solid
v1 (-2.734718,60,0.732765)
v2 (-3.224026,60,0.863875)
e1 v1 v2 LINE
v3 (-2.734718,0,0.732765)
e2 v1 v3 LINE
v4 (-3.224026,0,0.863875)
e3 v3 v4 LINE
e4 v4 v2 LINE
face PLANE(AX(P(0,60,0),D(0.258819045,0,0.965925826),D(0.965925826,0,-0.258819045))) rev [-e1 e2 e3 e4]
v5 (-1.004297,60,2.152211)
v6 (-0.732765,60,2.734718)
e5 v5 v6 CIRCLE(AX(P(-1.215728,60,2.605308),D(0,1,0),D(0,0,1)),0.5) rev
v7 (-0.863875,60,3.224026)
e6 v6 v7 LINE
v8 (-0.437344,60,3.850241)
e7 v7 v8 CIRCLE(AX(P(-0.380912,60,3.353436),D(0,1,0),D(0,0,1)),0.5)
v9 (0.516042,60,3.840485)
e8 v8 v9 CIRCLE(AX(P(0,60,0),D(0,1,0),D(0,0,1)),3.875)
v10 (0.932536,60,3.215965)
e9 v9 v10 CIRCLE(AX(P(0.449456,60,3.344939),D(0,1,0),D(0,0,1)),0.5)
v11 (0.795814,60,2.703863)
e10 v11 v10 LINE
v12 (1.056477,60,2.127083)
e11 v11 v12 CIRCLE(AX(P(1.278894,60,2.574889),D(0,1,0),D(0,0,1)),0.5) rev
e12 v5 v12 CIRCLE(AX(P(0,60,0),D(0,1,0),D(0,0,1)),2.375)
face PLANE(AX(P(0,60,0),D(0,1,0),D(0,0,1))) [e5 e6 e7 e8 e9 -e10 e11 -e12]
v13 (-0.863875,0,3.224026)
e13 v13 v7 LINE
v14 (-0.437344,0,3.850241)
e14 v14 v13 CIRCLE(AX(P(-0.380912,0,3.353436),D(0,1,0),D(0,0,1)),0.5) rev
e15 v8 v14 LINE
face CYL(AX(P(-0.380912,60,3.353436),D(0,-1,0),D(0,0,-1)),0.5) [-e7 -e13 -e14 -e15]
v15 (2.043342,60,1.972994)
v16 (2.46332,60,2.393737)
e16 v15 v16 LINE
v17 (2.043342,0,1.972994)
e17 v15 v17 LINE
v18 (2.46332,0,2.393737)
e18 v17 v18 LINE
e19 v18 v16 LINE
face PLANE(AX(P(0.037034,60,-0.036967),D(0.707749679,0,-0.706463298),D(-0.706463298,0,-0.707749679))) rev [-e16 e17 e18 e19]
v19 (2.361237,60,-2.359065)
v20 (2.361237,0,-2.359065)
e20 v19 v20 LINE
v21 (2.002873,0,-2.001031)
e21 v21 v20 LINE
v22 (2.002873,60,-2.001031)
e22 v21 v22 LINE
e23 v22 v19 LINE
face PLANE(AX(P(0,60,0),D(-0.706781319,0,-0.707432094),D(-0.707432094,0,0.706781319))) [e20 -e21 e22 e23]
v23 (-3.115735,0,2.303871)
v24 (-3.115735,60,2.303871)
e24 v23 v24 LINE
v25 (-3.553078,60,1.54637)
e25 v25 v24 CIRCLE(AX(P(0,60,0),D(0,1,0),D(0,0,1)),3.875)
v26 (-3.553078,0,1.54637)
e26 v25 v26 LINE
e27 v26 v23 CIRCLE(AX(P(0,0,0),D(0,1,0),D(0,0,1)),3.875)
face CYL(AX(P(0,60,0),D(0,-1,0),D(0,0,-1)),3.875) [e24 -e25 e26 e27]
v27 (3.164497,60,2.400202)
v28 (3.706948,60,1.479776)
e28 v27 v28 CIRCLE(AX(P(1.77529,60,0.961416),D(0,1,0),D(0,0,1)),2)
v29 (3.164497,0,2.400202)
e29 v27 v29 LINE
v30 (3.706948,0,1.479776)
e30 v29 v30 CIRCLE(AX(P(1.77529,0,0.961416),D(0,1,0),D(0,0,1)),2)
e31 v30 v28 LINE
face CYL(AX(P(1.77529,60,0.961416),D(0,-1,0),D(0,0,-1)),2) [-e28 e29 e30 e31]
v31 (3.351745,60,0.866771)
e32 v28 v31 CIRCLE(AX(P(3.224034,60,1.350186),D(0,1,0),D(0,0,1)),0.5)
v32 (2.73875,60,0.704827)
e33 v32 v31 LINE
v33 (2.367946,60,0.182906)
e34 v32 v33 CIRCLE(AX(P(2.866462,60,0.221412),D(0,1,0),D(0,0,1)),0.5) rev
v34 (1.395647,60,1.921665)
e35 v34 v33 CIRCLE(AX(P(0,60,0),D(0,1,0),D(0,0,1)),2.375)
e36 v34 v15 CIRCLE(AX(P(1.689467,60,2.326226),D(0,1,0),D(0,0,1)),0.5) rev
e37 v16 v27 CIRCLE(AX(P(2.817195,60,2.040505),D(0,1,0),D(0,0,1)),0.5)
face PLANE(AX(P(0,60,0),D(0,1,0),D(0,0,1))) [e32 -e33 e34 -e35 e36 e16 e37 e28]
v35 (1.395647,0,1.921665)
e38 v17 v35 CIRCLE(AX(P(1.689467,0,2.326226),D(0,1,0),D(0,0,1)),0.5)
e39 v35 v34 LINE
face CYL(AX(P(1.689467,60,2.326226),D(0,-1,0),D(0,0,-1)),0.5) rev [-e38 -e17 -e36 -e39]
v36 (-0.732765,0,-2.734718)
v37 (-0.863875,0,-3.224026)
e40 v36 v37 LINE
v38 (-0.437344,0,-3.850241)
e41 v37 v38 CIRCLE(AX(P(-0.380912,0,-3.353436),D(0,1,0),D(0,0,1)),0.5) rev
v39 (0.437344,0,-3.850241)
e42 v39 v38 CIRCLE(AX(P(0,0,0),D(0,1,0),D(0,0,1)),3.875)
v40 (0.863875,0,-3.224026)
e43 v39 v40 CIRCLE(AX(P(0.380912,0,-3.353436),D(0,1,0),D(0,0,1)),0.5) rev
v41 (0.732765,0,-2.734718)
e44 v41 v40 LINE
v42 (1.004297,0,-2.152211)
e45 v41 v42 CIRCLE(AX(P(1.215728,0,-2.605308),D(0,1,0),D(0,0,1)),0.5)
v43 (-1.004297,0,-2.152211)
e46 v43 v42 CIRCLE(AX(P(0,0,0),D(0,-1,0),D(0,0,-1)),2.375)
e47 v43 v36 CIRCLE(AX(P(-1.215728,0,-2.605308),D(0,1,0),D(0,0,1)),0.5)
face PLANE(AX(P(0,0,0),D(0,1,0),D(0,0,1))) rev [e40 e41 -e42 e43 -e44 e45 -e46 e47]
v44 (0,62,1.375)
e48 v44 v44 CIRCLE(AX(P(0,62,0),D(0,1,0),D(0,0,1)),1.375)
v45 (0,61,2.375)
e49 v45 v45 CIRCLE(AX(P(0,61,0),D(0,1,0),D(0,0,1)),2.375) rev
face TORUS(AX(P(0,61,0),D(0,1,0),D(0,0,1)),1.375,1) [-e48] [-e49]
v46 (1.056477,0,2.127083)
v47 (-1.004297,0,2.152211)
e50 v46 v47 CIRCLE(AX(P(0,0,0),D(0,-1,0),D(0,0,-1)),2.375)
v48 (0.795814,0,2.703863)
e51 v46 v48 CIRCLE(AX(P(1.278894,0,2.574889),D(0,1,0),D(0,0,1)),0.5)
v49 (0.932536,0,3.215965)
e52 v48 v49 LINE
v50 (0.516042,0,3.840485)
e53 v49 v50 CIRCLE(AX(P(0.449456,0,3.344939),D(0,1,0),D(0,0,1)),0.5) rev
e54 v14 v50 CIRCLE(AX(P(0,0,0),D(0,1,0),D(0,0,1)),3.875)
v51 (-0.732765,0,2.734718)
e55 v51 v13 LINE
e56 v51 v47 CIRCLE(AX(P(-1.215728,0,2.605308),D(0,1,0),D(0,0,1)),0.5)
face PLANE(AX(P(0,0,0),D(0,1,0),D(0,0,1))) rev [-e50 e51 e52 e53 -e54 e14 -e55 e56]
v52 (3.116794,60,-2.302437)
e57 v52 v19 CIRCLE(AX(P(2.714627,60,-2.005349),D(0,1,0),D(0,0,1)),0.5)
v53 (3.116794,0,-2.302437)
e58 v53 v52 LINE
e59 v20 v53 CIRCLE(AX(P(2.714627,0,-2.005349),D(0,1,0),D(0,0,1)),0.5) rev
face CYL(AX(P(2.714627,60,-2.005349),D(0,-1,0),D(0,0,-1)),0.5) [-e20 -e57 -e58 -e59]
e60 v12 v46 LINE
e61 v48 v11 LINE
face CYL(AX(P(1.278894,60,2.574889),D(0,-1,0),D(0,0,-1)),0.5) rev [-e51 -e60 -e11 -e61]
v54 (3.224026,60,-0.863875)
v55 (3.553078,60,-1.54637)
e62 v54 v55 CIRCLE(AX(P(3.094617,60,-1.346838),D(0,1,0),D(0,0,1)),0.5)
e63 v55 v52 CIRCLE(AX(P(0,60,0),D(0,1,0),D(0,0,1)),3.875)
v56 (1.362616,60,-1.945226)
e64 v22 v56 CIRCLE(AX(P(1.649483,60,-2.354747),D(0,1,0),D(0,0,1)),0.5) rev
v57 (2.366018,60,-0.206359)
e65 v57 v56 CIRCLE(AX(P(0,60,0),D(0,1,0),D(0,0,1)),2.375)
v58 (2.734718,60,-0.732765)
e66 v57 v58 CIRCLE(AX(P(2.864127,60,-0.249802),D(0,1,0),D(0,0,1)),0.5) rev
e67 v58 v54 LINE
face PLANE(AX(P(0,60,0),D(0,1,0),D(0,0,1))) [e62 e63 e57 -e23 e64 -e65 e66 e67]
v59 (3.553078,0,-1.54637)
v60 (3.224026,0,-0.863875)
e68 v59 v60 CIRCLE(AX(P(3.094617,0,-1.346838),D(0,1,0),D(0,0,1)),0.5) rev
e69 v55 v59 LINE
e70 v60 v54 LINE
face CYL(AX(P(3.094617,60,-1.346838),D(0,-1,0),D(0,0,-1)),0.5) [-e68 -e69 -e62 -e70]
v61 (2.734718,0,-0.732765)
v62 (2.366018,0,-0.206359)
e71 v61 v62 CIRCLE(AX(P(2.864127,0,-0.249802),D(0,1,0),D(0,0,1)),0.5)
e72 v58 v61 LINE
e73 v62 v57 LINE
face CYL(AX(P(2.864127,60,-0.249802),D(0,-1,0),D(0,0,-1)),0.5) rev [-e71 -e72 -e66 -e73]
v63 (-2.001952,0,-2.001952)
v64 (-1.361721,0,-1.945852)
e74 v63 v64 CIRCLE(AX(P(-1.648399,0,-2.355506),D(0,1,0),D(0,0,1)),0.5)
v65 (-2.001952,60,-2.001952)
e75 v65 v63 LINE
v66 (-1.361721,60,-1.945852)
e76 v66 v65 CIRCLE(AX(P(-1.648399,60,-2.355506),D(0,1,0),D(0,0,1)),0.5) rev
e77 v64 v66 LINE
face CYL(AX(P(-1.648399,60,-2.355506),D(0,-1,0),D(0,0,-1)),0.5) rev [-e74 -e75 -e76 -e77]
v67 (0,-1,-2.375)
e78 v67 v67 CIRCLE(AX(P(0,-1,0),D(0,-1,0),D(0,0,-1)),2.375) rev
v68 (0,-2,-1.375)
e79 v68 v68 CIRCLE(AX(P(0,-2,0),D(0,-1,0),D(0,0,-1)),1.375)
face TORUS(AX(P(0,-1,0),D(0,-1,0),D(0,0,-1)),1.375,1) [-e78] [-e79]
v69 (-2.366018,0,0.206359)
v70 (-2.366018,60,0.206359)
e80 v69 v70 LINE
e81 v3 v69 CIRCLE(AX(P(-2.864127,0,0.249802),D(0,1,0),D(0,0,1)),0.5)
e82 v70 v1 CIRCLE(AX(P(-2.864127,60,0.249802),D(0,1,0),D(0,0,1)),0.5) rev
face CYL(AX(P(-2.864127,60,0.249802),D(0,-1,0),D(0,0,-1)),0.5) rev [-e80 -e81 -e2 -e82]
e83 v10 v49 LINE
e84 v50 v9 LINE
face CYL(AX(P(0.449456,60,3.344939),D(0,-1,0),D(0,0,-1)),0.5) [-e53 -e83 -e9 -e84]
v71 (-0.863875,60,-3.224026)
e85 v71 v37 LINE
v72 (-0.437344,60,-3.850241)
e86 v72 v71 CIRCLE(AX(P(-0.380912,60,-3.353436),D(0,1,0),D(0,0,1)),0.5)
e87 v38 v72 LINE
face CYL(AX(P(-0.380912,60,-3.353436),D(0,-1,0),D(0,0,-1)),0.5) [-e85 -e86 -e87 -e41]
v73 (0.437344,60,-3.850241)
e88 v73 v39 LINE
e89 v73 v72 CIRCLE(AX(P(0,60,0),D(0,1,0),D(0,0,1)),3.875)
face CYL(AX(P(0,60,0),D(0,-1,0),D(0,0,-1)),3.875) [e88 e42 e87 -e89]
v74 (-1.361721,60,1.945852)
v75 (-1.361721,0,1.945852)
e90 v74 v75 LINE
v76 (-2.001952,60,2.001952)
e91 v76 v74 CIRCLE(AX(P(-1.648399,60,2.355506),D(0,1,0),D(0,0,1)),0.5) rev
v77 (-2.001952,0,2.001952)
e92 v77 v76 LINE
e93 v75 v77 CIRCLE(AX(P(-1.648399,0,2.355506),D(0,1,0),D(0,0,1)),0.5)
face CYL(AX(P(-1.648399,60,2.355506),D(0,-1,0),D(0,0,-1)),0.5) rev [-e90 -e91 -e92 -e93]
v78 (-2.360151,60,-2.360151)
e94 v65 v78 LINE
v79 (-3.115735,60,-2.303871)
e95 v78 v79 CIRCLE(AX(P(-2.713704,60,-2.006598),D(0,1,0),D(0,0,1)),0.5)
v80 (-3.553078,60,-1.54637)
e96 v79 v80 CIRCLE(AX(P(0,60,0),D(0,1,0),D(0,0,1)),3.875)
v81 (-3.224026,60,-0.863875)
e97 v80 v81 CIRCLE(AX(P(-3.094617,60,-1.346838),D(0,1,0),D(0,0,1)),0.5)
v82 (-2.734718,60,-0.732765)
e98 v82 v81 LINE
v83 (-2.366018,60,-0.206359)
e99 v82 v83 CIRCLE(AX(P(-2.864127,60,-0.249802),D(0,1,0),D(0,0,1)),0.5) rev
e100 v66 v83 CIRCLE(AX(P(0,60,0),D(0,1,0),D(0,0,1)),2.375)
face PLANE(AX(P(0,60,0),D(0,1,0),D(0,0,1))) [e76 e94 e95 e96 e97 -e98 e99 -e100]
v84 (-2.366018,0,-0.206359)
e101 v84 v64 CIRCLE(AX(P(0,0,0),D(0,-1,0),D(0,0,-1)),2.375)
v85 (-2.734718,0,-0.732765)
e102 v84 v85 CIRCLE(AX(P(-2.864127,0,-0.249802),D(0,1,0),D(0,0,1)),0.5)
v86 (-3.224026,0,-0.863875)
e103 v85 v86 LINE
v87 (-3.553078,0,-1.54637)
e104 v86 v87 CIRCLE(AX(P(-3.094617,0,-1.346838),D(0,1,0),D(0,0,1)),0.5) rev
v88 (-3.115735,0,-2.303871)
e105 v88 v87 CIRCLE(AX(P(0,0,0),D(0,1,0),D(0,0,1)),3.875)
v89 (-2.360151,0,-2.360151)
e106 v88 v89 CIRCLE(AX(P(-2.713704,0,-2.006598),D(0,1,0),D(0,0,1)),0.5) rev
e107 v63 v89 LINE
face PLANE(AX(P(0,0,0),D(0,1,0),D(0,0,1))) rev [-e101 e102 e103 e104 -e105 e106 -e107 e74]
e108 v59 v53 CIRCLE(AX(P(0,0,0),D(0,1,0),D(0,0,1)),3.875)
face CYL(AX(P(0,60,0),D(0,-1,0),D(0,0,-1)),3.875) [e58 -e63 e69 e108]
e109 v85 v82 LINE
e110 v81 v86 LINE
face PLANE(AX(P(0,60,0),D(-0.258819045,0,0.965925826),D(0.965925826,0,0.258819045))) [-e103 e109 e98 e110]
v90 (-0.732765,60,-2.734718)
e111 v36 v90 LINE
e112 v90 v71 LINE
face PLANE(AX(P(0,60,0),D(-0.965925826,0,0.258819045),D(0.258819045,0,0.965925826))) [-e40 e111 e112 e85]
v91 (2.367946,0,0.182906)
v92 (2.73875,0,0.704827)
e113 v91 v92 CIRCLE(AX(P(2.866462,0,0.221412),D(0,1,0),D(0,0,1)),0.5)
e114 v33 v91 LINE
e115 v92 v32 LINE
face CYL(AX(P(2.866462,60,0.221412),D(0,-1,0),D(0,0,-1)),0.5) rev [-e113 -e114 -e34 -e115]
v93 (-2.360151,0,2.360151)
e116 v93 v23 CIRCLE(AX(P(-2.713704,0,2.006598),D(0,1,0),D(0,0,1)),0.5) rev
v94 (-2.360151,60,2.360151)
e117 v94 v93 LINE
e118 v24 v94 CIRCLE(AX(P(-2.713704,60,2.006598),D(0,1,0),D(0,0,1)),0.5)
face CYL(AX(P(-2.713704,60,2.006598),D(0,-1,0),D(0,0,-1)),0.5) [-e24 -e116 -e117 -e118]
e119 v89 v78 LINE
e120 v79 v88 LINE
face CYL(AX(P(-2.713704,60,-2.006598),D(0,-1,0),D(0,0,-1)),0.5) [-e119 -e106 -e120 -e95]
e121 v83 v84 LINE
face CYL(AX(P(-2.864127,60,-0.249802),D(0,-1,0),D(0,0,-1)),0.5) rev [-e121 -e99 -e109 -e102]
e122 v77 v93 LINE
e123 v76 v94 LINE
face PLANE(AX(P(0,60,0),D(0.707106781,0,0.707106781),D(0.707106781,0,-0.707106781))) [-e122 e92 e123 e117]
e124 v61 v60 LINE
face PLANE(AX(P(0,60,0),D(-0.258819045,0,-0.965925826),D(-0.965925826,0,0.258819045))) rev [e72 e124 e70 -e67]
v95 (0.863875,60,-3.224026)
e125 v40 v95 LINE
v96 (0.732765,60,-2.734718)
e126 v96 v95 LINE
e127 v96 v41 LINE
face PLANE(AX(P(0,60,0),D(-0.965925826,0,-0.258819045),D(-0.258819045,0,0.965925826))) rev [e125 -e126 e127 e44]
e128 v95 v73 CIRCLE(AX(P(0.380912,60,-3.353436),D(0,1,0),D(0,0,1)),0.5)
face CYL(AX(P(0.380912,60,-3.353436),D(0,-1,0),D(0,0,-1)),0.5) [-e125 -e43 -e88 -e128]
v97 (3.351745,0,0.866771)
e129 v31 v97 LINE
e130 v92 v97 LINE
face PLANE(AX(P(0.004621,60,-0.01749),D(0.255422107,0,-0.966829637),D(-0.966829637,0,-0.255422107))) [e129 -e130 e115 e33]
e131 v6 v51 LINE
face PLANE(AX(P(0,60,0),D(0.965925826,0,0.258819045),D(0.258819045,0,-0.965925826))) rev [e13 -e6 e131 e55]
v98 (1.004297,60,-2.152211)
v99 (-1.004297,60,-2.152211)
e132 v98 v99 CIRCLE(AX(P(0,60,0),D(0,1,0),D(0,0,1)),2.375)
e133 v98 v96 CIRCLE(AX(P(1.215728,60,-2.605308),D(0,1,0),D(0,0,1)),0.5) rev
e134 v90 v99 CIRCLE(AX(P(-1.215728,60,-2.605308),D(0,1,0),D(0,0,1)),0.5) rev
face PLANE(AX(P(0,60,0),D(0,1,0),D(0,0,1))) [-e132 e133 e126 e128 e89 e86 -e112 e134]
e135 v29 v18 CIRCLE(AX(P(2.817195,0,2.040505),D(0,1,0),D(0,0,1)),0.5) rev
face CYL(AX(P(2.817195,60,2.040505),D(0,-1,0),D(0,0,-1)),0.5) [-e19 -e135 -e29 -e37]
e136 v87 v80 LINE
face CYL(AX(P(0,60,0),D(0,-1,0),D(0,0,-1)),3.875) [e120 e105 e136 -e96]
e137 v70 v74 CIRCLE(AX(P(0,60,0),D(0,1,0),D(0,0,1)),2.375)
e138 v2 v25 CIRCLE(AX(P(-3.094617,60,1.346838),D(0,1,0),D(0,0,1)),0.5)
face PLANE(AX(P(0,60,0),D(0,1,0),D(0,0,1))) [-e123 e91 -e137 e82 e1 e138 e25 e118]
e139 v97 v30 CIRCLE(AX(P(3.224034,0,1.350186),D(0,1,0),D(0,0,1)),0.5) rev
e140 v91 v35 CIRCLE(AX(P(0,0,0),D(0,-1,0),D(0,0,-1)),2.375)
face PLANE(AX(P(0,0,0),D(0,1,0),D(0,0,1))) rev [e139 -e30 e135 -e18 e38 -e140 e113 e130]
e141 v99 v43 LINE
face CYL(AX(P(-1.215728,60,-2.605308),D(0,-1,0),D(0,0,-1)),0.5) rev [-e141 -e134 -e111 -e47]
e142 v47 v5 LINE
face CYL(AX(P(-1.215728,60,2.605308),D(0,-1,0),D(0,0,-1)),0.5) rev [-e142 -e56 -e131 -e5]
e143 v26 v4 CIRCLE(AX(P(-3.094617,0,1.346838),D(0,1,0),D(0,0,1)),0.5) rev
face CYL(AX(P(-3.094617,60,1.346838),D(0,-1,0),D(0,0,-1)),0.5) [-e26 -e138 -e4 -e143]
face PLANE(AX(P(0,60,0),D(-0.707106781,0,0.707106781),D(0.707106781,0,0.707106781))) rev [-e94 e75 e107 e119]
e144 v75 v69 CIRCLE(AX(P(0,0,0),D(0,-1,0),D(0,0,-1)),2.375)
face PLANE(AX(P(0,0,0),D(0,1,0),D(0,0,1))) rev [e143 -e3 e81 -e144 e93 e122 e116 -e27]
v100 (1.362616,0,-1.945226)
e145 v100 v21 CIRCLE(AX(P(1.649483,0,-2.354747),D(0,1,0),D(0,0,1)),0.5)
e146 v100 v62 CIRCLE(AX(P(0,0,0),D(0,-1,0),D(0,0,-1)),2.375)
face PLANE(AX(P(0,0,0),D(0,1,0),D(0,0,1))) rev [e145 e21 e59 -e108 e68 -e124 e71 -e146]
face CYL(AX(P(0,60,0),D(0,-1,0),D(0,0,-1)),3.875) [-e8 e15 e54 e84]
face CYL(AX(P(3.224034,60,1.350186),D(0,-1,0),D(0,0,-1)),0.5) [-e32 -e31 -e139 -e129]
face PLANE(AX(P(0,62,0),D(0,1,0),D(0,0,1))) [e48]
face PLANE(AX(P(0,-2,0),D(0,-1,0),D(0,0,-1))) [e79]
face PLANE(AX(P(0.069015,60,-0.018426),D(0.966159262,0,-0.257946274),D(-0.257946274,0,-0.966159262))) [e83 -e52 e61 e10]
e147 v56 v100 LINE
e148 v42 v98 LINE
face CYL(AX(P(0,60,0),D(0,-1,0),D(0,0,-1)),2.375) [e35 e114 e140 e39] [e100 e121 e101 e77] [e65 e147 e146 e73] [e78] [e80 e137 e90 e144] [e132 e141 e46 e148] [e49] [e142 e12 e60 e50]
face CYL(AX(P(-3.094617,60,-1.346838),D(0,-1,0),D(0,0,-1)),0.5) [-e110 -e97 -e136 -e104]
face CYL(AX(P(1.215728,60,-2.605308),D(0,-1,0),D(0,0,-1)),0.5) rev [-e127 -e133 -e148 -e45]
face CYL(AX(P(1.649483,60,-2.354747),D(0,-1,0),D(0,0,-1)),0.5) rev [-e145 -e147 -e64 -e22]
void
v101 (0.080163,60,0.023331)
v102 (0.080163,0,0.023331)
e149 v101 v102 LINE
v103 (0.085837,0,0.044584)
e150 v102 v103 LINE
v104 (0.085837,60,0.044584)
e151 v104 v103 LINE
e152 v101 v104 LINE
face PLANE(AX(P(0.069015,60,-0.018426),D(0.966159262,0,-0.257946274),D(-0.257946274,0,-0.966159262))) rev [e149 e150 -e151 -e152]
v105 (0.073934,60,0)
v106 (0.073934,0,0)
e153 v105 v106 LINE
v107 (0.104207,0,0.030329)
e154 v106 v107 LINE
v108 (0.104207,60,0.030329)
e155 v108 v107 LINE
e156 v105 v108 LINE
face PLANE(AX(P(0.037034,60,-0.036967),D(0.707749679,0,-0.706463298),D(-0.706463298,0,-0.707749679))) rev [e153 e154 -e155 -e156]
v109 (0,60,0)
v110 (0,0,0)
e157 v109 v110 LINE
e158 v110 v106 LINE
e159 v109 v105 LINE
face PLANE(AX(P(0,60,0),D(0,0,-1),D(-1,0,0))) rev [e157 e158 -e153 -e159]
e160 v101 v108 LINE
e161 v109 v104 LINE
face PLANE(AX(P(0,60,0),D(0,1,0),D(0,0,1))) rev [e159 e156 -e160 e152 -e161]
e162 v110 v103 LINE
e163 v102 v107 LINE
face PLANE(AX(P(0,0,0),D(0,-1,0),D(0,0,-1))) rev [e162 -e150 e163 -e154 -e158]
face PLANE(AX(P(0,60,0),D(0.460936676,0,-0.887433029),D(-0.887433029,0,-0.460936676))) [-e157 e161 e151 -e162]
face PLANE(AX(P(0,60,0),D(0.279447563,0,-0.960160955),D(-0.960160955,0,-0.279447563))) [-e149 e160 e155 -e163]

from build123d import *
from build123d.topology import SkipClean

# Parameters (mm, degrees)
BOSS_EXTRUDE1_DEPTH = 60
SKETCH4_R           = 2.375
BOSS_EXTRUDE3_DEPTH = 2
FILLET1_R           = 0.5
BOSS_EXTRUDE5_START = 2
SKETCH6_R           = 2.375
BOSS_EXTRUDE5_DEPTH = 2
FILLET2_R           = 1


with BuildPart() as part:
    # Sketch2 → Boss-Extrude1 (new body)
    with BuildSketch(Plane(origin=(0, 0, 0), x_dir=(1, 0, 0), z_dir=(0, 1, 0))):
        with BuildLine():
            Line((3.775215965, -0.978645895), (2.300774305, -0.58912019))
            ThreePointArc((2.300774305, -0.58912019), (2.374963211, 0.013219106), (2.294073837, 0.614695232))
            Line((2.294073837, 0.614695232), (3.742962577, 1.0029238))
            ThreePointArc((3.742962577, 1.0029238), (3.356294138, 1.936727823), (2.741299364, 2.73877761))
            Line((2.741299364, 2.73877761), (1.680151223, 1.678605632))
            ThreePointArc((1.680151223, 1.678605632), (1.187973207, 2.056537055), (0.614695232, 2.294073837))
            Line((0.614695232, 2.294073837), (1.0029238, 3.742962577))
            ThreePointArc((1.0029238, 3.742962577), (0, 3.875), (-1.0029238, 3.742962577))
            Line((-1.0029238, 3.742962577), (-0.614695232, 2.294073837))
            ThreePointArc((-0.614695232, 2.294073837), (-1.1875, 2.056810334), (-1.679378605, 1.679378605))
            Line((-1.679378605, 1.679378605), (-2.740038777, 2.740038777))
            ThreePointArc((-2.740038777, 2.740038777), (-3.35584844, 1.9375), (-3.742962577, 1.0029238))
            Line((-3.742962577, 1.0029238), (-2.294073837, 0.614695232))
            ThreePointArc((-2.294073837, 0.614695232), (-2.375, 0), (-2.294073837, -0.614695232))
            Line((-2.294073837, -0.614695232), (-3.742962577, -1.0029238))
            ThreePointArc((-3.742962577, -1.0029238), (-3.35584844, -1.9375), (-2.740038777, -2.740038777))
            Line((-2.740038777, -2.740038777), (-1.679378605, -1.679378605))
            ThreePointArc((-1.679378605, -1.679378605), (-1.1875, -2.056810334), (-0.614695232, -2.294073837))
            Line((-0.614695232, -2.294073837), (-1.0029238, -3.742962577))
            ThreePointArc((-1.0029238, -3.742962577), (0.033967076, -3.874851125), (1.068386506, -3.724805401))
            Line((1.068386506, -3.724805401), (0.681359786, -2.275164575))
            ThreePointArc((0.681359786, -2.275164575), (1.238849907, -2.026296106), (1.714477211, -1.643530618))
            Line((1.714477211, -1.643530618), (2.767163136, -2.698133353))
            ThreePointArc((2.767163136, -2.698133353), (3.500652231, -1.972912562), (3.775215965, -0.978645895))
        make_face()
        Polygon((0.085836926, -0.044584082), (0, 0), (0.073933818, 0), (0.104207494, -0.030328801), (0.080162685, -0.023330742), align=None, mode=Mode.SUBTRACT)
    extrude(amount=BOSS_EXTRUDE1_DEPTH)

    # Sketch4 → Boss-Extrude3 (add)
    with BuildSketch(Plane(origin=(0, 60, 0), x_dir=(1, 0, 0), z_dir=(0, 1, 0))):
        with Locations(Location((0, 0, 0), (0, 0, 75))):
            Circle(SKETCH4_R)
    extrude(amount=BOSS_EXTRUDE3_DEPTH)

    # Fillet1
    # the kernel refuses this fillet: 0.5 mm, written as the material it adds along each edge
    with BuildSketch(Plane(origin=(-2.294073837, 0, 0.614695232), x_dir=(-0.1735157400494046, 0, -0.9848310961556339), z_dir=(0, 1, 0)), Plane(origin=(-1.679378605, 0, -1.679378605), x_dir=(0.7661308776829403, 0, -0.6426845869170722), z_dir=(0, 1, 0)), Plane(origin=(0.614695232, 0, -2.294073837), x_dir=(0.939646617732385, 0, 0.3421465092384974), z_dir=(0, 1, 0)), Plane(origin=(2.294073837, 0, -0.614695232), x_dir=(0.1735157400495284, 0, 0.9848310961556122), z_dir=(0, 1, 0)), Plane(origin=(-0.614695232, 0, 2.294073837), x_dir=(-0.9396466177323688, 0, -0.3421465092385419), z_dir=(0, 1, 0))) as fillet1_piece_1:
        with BuildLine():
            CenterArc((0.458270974, 0.498091484), FILLET1_R, 185.007705084, 79.984589832)
            Line((-0.03982051, 0.45444663), (0, 0))
            ThreePointArc((0, 0), (0.20731306, 0.00906545), (0.414626119, 0))
        make_face()
    extrude(amount=60)
    with BuildSketch(Plane(origin=(-2.294073837, 0, -0.614695232), x_dir=(-0.17351574004940104, 0, 0.9848310961556345), z_dir=(0, 1, 0)), Plane(origin=(-0.614695232, 0, -2.294073837), x_dir=(-0.9396466177323672, 0, 0.3421465092385461), z_dir=(0, 1, 0)), Plane(origin=(1.680151223, 0, -1.678605632), x_dir=(-0.7658350540129166, 0, -0.643037067395833), z_dir=(0, 1, 0))) as fillet1_piece_2:
        with BuildLine():
            CenterArc((0.458270974, -0.498091484), FILLET1_R, 95.007705084, 79.984589832)
            Line((-0.03982051, -0.45444663), (0, 0))
            ThreePointArc((0, 0), (0.20731306, -0.00906545), (0.414626119, 0))
        make_face()
    extrude(amount=60)
    with BuildSketch(Plane(origin=(2.300774305, 0, 0.58912019), x_dir=(0.9668296370387235, 0, 0.2554221073900419), z_dir=(0, 1, 0))) as fillet1_piece_3:
        with BuildLine():
            CenterArc((0.453002414, 0.5), FILLET1_R, 190.38170854, 79.61829146)
            ThreePointArc((-0.038812111, 0.409897433), (-0.010506812, 0.205791362), (0, 0))
            Line((0, 0), (0.453002414, 0))
        make_face()
    extrude(amount=60)
    with BuildSketch(Plane(origin=(1.714477211, 0, 1.643530618), x_dir=(0.7064632978713469, 0, 0.7077496794494086), z_dir=(0, 1, 0))) as fillet1_piece_4:
        with BuildLine():
            CenterArc((0.465508471, -0.5), FILLET1_R, 90, 81.041880237)
            ThreePointArc((-0.02839274, -0.422143763), (-0.00477723, -0.211705398), (0, 0))
            Line((0, 0), (0.465508471, 0))
        make_face()
    extrude(amount=60)
    with BuildSketch(Plane(origin=(0.681359786, 0, 2.275164575), x_dir=(0.25794627414893684, 0, 0.966159262053975), z_dir=(0, 1, 0))) as fillet1_piece_5:
        with BuildLine():
            CenterArc((0.443713653, 0.5), FILLET1_R, 191.464392376, 78.535607624)
            ThreePointArc((-0.046310555, 0.400620549), (-0.014636445, 0.201295026), (0, 0))
            Line((0, 0), (0.443713653, 0))
        make_face()
    extrude(amount=60)
    with BuildSketch(Plane(origin=(-1.679378605, 0, 1.679378605), x_dir=(-0.7071067811865471, 0, 0.707106781186548), z_dir=(0, 1, 0))) as fillet1_piece_6:
        with BuildLine():
            CenterArc((0.456187913, 0.5), FILLET1_R, 190.015410168, 79.984589832)
            ThreePointArc((-0.036192593, 0.413043478), (-0.00906545, 0.20731306), (0, 0))
            Line((0, 0), (0.456187913, 0))
        make_face()
    extrude(amount=60)
    # the kernel refuses this fillet: 0.5 mm, written as the material it takes off along each edge
    with BuildSketch(Plane(origin=(-2.740038777, -1.439160897, 2.740038777), x_dir=(-0.6526300069150477, 0, -0.7576767609436524), z_dir=(0, 1, 0)), Plane(origin=(-3.742962577, -1.439160897, -1.0029238), x_dir=(0.3298523193767966, 0, -0.9440325457322686), z_dir=(0, 1, 0)), Plane(origin=(2.741299364, -1.439160897, -2.73877761), x_dir=(0.652281279601926, 0, 0.7579769998363237), z_dir=(0, 1, 0))) as fillet1_2_piece_1:
        with BuildLine():
            CenterArc((0.538524723, -0.49861874), FILLET1_R, 85.740187873, 98.519624254)
            Line((0.039905983, -0.535758376), (0, 0))
            ThreePointArc((0, 0), (0.287832179, 0.010704768), (0.575664359, 0))
        make_face()
    extrude(amount=62.878321794, mode=Mode.SUBTRACT)
    with BuildSketch(Plane(origin=(-3.742962577, -1.439160897, 1.0029238), x_dir=(0.9659258262890679, 0, -0.2588190451025218), z_dir=(0, 1, 0)), Plane(origin=(-2.740038777, -1.439160897, -2.740038777), x_dir=(0.7071067811865476, 0, 0.7071067811865476), z_dir=(0, 1, 0)), Plane(origin=(3.742962577, -1.439160897, -1.0029238), x_dir=(-0.9659258262890681, 0, 0.25881904510252185), z_dir=(0, 1, 0)), Plane(origin=(-1.0029238, -1.439160897, 3.742962577), x_dir=(0.2588190451025216, 0, -0.9659258262890681), z_dir=(0, 1, 0))) as fillet1_2_piece_2:
        with BuildLine():
            CenterArc((0.537242519, -0.5), FILLET1_R, 90, 98.519624254)
            ThreePointArc((0.04275993, -0.574074074), (0.010704768, -0.287832179), (0, 0))
            Line((0, 0), (0.537242519, 0))
        make_face()
    extrude(amount=62.878321794, mode=Mode.SUBTRACT)
    with BuildSketch(Plane(origin=(-1.0029238, -1.439160897, -3.742962577), x_dir=(0.25881904510252174, 0, 0.965925826289068), z_dir=(0, 1, 0))) as fillet1_2_piece_3:
        with BuildLine():
            CenterArc((0.537242519, 0.5), FILLET1_R, 171.480375746, 98.519624254)
            ThreePointArc((0.04275993, 0.574074074), (0.010704768, 0.287832179), (0, 0))
            Line((0, 0), (0.537242519, 0))
        make_face()
    extrude(amount=62.878321794, mode=Mode.SUBTRACT)
    with BuildSketch(Plane(origin=(1.0029238, -1.439160897, -3.742962577), x_dir=(-0.9824823262918377, 0, -0.1863557847886099), z_dir=(0, 1, 0))) as fillet1_2_piece_4:
        with BuildLine():
            CenterArc((0.538524723, 0.49861874), FILLET1_R, 175.740187873, 98.519624254)
            Line((0.039905983, 0.535758376), (0, 0))
            ThreePointArc((0, 0), (0.287832179, -0.010704768), (0.575664359, 0))
        make_face()
    extrude(amount=62.878321794, mode=Mode.SUBTRACT)
    with BuildSketch(Plane(origin=(3.775215965, -1.264396568, 0.978645895), x_dir=(-0.9668296370387236, 0, -0.25542210739004173), z_dir=(0, 1, 0))) as fillet1_2_piece_5:
        with BuildLine():
            CenterArc((0.437999819, 0.5), FILLET1_R, 179.77718135, 90.22281865)
            ThreePointArc((-0.0619964, 0.501944455), (-0.046928547, 0.249004631), (0, 0))
            Line((0, 0), (0.437999819, 0))
        make_face()
    extrude(amount=62.528793137, mode=Mode.SUBTRACT)
    with BuildSketch(Plane(origin=(2.767163136, -1.241563867, 2.698133353), x_dir=(0.8000663385432955, 0, -0.5999115384203949), z_dir=(0, 1, 0))) as fillet1_2_piece_6:
        with BuildLine():
            CenterArc((0.434547354, 0.496131331), FILLET1_R, 188.084320914, 89.047719887)
            Line((-0.060483736, 0.425816179), (0, 0))
            ThreePointArc((0, 0), (0.248312773, -0.015474675), (0.496625547, 0))
        make_face()
    extrude(amount=62.483127735, mode=Mode.SUBTRACT)
    with BuildSketch(Plane(origin=(1.068386506, -1.410819518, 3.724805401), x_dir=(-0.9787647804449897, 0, 0.20498659605074468), z_dir=(0, 1, 0))) as fillet1_2_piece_7:
        with BuildLine():
            CenterArc((0.527919562, -0.498672678), FILLET1_R, 85.824226653, 97.295295094)
            Line((0.028660468, -0.525882193), (0, 0))
            ThreePointArc((0, 0), (0.282163904, 0.010286747), (0.564327807, 0))
        make_face()
    extrude(amount=62.821639036, mode=Mode.SUBTRACT)

    # Sketch6 → Boss-Extrude5 (add)
    with SkipClean():  # the faces are left unmerged after this step: merging them gives an invalid solid
        with BuildSketch(Plane.XZ.offset(BOSS_EXTRUDE5_START)):
            with Locations(Location((0, 0, 0), (0, 0, 270))):
                Circle(SKETCH6_R)
        extrude(amount=-BOSS_EXTRUDE5_DEPTH)

    # Fillet2
    fillet2_edges = [part.edges().sort_by_distance(p)[0] for p in [
        (-0.614695232, 62, 2.294073837),
        (0, -2, 2.375),
    ]]
    fillet(fillet2_edges, radius=FILLET2_R)


solid = part.part
